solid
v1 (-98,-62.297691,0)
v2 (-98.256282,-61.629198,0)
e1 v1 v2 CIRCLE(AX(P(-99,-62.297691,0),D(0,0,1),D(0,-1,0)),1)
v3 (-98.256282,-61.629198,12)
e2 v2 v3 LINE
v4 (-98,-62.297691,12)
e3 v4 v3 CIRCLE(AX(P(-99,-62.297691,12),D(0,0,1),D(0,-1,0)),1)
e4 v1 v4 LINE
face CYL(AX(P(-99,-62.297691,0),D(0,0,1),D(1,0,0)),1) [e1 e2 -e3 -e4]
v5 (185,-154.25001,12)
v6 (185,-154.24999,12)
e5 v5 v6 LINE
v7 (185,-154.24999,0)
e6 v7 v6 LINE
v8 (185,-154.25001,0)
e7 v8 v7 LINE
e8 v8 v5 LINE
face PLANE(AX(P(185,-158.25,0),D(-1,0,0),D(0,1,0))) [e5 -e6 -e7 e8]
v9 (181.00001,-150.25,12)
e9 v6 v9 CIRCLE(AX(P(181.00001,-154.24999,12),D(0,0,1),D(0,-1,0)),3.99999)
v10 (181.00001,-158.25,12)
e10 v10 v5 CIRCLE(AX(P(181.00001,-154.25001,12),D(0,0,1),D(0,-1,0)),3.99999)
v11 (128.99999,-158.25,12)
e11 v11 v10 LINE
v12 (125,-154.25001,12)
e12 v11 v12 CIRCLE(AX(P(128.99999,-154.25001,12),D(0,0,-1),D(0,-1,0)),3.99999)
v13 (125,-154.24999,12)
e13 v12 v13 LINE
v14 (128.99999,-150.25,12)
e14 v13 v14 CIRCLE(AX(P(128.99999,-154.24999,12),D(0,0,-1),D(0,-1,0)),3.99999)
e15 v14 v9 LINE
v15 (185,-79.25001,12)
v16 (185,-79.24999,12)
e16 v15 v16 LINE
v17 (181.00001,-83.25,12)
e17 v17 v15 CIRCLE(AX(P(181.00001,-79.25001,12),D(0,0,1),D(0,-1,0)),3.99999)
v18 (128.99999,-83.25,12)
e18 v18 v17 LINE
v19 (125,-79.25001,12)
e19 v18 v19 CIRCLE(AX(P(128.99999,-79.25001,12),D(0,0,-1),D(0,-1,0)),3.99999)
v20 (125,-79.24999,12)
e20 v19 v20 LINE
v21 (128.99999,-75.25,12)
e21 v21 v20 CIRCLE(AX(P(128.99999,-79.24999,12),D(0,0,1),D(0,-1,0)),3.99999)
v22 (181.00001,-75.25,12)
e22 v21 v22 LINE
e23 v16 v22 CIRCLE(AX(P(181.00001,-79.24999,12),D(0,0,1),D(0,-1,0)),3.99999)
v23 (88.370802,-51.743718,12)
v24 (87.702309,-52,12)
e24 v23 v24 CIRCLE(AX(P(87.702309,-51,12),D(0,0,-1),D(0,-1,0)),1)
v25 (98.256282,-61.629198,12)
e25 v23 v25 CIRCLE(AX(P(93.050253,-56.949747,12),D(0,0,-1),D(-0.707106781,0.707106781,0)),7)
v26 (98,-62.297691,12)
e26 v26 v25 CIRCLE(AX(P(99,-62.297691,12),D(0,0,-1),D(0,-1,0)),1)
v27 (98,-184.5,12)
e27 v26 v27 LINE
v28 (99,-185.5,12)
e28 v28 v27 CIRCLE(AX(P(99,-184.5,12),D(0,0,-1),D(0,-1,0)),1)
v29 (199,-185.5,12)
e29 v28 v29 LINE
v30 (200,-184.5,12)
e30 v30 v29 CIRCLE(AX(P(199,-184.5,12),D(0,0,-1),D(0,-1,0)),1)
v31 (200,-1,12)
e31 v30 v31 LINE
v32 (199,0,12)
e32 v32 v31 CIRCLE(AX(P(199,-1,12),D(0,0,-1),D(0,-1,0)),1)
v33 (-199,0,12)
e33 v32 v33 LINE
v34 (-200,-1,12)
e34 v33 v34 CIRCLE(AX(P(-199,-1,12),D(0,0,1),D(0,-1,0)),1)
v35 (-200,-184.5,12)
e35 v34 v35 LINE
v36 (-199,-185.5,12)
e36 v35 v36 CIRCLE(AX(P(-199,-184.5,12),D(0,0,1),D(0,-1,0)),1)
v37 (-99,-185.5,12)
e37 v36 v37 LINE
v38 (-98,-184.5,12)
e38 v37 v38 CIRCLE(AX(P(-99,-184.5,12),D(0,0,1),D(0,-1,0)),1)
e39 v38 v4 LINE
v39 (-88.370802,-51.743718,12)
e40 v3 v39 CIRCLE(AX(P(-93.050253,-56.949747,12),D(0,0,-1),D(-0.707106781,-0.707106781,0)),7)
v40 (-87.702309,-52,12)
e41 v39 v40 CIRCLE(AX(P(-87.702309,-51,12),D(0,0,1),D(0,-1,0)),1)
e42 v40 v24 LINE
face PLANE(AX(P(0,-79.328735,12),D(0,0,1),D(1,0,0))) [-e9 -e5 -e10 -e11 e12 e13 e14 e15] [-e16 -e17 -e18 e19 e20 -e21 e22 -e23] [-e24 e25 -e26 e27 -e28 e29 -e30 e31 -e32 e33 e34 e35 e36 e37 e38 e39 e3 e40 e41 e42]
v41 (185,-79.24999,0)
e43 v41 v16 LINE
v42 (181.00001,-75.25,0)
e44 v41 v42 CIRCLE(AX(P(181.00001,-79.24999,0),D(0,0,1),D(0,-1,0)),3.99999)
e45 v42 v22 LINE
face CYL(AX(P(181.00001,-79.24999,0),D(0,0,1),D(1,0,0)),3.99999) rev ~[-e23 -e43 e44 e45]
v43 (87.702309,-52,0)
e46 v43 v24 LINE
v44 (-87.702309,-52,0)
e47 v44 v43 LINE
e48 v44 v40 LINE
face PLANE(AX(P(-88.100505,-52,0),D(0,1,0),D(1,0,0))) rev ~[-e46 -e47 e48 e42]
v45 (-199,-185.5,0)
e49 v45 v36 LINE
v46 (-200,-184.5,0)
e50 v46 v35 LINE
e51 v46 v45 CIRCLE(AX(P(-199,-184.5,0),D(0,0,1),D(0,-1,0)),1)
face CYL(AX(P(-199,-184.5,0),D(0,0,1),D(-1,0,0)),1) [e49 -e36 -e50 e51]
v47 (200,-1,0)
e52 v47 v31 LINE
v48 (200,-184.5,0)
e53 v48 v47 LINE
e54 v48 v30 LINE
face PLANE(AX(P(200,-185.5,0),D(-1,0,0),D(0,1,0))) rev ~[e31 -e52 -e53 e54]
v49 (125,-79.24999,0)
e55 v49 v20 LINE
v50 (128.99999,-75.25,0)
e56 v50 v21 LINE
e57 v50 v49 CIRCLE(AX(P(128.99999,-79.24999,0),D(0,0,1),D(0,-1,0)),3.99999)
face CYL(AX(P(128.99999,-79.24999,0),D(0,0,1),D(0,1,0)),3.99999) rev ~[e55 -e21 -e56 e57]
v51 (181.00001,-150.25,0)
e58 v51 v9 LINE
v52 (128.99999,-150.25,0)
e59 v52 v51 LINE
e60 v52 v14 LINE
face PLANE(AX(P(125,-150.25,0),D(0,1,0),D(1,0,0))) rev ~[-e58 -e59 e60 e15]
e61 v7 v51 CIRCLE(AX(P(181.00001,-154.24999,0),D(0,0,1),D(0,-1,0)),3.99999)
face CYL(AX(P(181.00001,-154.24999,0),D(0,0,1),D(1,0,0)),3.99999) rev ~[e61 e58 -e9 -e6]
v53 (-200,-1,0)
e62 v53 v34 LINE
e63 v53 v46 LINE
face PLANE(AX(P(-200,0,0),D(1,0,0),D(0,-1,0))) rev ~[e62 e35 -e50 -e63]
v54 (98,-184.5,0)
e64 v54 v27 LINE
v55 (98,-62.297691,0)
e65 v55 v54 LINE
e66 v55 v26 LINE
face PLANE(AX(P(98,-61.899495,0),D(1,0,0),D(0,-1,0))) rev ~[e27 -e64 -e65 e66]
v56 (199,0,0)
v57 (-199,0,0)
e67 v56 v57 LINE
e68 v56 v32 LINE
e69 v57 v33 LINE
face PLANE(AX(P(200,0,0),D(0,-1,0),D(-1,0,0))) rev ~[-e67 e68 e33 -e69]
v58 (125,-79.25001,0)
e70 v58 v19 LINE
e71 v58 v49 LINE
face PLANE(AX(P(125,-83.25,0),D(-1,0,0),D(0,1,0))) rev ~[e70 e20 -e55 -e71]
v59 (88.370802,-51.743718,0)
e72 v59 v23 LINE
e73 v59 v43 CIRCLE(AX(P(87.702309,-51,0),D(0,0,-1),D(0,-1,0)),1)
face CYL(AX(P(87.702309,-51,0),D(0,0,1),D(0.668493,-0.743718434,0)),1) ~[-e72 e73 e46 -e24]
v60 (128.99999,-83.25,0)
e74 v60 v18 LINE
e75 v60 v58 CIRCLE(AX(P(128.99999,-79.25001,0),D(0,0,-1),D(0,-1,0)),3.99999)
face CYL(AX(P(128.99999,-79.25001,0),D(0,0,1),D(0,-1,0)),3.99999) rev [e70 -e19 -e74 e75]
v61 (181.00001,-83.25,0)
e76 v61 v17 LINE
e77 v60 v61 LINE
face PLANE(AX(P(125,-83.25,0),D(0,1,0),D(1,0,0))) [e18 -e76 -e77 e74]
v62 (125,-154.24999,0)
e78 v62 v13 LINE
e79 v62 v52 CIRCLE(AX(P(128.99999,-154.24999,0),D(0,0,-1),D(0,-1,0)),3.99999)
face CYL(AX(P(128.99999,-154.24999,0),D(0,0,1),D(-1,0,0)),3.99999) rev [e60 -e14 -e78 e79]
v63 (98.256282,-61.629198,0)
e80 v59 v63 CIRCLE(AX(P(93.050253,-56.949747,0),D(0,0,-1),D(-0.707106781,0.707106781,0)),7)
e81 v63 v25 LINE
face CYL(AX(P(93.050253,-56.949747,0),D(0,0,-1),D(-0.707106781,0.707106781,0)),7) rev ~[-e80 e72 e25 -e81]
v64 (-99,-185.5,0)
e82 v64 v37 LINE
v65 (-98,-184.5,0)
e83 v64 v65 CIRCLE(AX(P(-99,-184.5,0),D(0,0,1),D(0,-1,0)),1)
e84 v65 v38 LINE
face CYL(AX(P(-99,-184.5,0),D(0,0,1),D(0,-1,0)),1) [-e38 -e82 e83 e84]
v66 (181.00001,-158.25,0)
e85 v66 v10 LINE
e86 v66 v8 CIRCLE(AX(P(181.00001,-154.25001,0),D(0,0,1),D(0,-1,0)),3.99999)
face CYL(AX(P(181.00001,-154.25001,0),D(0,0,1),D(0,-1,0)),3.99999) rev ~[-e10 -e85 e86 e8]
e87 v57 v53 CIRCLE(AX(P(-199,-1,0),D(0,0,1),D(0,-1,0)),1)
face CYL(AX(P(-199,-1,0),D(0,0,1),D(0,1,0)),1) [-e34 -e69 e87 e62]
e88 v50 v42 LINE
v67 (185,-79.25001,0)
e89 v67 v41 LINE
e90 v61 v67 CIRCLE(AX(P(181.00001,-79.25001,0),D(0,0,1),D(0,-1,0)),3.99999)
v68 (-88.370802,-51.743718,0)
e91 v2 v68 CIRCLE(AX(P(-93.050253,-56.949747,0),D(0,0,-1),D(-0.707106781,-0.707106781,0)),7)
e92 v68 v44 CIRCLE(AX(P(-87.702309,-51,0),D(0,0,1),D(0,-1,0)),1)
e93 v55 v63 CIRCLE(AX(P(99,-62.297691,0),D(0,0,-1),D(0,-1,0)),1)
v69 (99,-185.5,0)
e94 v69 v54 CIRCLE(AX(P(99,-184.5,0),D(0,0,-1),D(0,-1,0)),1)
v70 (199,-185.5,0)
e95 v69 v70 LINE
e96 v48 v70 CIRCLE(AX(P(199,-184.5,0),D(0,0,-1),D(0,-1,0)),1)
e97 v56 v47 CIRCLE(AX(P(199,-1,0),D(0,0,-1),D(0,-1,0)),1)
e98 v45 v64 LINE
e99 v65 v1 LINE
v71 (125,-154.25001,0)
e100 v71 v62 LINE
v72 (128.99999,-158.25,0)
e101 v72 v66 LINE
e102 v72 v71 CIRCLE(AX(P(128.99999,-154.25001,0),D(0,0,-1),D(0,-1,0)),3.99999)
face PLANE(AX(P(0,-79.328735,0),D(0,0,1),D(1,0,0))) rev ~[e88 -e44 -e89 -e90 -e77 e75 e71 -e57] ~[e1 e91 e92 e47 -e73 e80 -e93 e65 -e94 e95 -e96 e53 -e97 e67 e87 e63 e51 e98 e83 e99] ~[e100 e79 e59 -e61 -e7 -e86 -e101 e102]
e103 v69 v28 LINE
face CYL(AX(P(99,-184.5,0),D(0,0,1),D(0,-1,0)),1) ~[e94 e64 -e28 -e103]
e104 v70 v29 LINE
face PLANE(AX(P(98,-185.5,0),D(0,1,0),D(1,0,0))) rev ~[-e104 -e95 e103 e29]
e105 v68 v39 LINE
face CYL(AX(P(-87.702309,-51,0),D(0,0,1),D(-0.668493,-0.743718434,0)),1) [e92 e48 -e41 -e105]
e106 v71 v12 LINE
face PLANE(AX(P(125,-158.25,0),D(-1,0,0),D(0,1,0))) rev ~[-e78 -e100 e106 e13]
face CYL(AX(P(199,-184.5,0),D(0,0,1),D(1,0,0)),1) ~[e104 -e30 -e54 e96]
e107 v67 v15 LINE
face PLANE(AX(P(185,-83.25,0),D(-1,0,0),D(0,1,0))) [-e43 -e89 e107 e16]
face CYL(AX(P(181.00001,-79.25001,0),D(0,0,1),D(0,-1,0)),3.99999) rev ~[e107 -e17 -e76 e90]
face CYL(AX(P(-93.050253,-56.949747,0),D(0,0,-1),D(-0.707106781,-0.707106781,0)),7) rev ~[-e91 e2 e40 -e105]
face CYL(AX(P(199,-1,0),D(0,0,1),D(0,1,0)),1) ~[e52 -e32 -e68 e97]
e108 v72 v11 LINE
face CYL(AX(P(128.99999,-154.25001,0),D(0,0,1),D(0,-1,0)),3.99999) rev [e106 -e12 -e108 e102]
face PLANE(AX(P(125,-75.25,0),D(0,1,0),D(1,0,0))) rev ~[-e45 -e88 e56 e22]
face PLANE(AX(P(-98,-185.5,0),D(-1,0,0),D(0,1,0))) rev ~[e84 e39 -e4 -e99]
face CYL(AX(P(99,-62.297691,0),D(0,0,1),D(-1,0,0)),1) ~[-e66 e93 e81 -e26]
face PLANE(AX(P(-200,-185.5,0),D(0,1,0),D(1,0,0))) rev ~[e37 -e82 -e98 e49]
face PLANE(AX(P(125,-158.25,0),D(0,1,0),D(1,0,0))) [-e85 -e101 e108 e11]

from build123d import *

# Parameters (mm, degrees)
F0_W     = 60
F0_H     = 8
F1_DEPTH = 12
F2_R     = 1
F3_R     = 3.99999


# Not quite as in the source:
# - a fillet or chamfer is up to 0.001 mm smaller than in the source, because OpenCascade refuses the exact size


with BuildPart() as f1:
    # F0 (on Top) → F1 (new body)
    with BuildSketch(Plane.XY):
        with BuildLine():
            Line((200, 0), (-200, 0))
            Line((-200, 0), (-200, -185.5))
            Line((-200, -185.5), (-98, -185.5))
            Line((-98, -185.5), (-98, -61.8994949366))
            ThreePointArc((-98, -61.8994949366), (-98, -52), (-88.1005050634, -52))
            Line((-88.1005050634, -52), (88.1005050634, -52))
            ThreePointArc((88.1005050634, -52), (98, -52), (98, -61.8994949366))
            Line((98, -61.8994949366), (98, -185.5))
            Line((98, -185.5), (200, -185.5))
            Line((200, -185.5), (200, 0))
        make_face()
        with Locations((155, -154.25)):
            Rectangle(F0_W, F0_H, mode=Mode.SUBTRACT)
        with Locations((155, -79.25)):
            Rectangle(F0_W, F0_H, mode=Mode.SUBTRACT)
    extrude(amount=F1_DEPTH)

    # F2
    f2_edges = [f1.edges().sort_by_distance(p)[0] for p in [
        (-98, -185.5, 6),
        (-98, -61.899495, 6),
        (-88.100505, -52, 6),
        (88.100505, -52, 6),
        (98, -61.899495, 6),
        (98, -185.5, 6),
        (200, -185.5, 6),
        (200, 0, 6),
        (-200, 0, 6),
        (-200, -185.5, 6),
    ]]
    fillet(f2_edges, radius=F2_R)

    # F3 (radius 4 in the source; OpenCascade refuses exactly that, so slightly less here)
    f3_edges = [f1.edges().sort_by_distance(p)[0] for p in [
        (125, -158.25, 6),
        (125, -150.25, 6),
        (185, -158.25, 6),
        (185, -150.25, 6),
        (125, -83.25, 6),
        (125, -75.25, 6),
        (185, -83.25, 6),
        (185, -75.25, 6),
    ]]
    fillet(f3_edges, radius=F3_R)


solid = f1.part
